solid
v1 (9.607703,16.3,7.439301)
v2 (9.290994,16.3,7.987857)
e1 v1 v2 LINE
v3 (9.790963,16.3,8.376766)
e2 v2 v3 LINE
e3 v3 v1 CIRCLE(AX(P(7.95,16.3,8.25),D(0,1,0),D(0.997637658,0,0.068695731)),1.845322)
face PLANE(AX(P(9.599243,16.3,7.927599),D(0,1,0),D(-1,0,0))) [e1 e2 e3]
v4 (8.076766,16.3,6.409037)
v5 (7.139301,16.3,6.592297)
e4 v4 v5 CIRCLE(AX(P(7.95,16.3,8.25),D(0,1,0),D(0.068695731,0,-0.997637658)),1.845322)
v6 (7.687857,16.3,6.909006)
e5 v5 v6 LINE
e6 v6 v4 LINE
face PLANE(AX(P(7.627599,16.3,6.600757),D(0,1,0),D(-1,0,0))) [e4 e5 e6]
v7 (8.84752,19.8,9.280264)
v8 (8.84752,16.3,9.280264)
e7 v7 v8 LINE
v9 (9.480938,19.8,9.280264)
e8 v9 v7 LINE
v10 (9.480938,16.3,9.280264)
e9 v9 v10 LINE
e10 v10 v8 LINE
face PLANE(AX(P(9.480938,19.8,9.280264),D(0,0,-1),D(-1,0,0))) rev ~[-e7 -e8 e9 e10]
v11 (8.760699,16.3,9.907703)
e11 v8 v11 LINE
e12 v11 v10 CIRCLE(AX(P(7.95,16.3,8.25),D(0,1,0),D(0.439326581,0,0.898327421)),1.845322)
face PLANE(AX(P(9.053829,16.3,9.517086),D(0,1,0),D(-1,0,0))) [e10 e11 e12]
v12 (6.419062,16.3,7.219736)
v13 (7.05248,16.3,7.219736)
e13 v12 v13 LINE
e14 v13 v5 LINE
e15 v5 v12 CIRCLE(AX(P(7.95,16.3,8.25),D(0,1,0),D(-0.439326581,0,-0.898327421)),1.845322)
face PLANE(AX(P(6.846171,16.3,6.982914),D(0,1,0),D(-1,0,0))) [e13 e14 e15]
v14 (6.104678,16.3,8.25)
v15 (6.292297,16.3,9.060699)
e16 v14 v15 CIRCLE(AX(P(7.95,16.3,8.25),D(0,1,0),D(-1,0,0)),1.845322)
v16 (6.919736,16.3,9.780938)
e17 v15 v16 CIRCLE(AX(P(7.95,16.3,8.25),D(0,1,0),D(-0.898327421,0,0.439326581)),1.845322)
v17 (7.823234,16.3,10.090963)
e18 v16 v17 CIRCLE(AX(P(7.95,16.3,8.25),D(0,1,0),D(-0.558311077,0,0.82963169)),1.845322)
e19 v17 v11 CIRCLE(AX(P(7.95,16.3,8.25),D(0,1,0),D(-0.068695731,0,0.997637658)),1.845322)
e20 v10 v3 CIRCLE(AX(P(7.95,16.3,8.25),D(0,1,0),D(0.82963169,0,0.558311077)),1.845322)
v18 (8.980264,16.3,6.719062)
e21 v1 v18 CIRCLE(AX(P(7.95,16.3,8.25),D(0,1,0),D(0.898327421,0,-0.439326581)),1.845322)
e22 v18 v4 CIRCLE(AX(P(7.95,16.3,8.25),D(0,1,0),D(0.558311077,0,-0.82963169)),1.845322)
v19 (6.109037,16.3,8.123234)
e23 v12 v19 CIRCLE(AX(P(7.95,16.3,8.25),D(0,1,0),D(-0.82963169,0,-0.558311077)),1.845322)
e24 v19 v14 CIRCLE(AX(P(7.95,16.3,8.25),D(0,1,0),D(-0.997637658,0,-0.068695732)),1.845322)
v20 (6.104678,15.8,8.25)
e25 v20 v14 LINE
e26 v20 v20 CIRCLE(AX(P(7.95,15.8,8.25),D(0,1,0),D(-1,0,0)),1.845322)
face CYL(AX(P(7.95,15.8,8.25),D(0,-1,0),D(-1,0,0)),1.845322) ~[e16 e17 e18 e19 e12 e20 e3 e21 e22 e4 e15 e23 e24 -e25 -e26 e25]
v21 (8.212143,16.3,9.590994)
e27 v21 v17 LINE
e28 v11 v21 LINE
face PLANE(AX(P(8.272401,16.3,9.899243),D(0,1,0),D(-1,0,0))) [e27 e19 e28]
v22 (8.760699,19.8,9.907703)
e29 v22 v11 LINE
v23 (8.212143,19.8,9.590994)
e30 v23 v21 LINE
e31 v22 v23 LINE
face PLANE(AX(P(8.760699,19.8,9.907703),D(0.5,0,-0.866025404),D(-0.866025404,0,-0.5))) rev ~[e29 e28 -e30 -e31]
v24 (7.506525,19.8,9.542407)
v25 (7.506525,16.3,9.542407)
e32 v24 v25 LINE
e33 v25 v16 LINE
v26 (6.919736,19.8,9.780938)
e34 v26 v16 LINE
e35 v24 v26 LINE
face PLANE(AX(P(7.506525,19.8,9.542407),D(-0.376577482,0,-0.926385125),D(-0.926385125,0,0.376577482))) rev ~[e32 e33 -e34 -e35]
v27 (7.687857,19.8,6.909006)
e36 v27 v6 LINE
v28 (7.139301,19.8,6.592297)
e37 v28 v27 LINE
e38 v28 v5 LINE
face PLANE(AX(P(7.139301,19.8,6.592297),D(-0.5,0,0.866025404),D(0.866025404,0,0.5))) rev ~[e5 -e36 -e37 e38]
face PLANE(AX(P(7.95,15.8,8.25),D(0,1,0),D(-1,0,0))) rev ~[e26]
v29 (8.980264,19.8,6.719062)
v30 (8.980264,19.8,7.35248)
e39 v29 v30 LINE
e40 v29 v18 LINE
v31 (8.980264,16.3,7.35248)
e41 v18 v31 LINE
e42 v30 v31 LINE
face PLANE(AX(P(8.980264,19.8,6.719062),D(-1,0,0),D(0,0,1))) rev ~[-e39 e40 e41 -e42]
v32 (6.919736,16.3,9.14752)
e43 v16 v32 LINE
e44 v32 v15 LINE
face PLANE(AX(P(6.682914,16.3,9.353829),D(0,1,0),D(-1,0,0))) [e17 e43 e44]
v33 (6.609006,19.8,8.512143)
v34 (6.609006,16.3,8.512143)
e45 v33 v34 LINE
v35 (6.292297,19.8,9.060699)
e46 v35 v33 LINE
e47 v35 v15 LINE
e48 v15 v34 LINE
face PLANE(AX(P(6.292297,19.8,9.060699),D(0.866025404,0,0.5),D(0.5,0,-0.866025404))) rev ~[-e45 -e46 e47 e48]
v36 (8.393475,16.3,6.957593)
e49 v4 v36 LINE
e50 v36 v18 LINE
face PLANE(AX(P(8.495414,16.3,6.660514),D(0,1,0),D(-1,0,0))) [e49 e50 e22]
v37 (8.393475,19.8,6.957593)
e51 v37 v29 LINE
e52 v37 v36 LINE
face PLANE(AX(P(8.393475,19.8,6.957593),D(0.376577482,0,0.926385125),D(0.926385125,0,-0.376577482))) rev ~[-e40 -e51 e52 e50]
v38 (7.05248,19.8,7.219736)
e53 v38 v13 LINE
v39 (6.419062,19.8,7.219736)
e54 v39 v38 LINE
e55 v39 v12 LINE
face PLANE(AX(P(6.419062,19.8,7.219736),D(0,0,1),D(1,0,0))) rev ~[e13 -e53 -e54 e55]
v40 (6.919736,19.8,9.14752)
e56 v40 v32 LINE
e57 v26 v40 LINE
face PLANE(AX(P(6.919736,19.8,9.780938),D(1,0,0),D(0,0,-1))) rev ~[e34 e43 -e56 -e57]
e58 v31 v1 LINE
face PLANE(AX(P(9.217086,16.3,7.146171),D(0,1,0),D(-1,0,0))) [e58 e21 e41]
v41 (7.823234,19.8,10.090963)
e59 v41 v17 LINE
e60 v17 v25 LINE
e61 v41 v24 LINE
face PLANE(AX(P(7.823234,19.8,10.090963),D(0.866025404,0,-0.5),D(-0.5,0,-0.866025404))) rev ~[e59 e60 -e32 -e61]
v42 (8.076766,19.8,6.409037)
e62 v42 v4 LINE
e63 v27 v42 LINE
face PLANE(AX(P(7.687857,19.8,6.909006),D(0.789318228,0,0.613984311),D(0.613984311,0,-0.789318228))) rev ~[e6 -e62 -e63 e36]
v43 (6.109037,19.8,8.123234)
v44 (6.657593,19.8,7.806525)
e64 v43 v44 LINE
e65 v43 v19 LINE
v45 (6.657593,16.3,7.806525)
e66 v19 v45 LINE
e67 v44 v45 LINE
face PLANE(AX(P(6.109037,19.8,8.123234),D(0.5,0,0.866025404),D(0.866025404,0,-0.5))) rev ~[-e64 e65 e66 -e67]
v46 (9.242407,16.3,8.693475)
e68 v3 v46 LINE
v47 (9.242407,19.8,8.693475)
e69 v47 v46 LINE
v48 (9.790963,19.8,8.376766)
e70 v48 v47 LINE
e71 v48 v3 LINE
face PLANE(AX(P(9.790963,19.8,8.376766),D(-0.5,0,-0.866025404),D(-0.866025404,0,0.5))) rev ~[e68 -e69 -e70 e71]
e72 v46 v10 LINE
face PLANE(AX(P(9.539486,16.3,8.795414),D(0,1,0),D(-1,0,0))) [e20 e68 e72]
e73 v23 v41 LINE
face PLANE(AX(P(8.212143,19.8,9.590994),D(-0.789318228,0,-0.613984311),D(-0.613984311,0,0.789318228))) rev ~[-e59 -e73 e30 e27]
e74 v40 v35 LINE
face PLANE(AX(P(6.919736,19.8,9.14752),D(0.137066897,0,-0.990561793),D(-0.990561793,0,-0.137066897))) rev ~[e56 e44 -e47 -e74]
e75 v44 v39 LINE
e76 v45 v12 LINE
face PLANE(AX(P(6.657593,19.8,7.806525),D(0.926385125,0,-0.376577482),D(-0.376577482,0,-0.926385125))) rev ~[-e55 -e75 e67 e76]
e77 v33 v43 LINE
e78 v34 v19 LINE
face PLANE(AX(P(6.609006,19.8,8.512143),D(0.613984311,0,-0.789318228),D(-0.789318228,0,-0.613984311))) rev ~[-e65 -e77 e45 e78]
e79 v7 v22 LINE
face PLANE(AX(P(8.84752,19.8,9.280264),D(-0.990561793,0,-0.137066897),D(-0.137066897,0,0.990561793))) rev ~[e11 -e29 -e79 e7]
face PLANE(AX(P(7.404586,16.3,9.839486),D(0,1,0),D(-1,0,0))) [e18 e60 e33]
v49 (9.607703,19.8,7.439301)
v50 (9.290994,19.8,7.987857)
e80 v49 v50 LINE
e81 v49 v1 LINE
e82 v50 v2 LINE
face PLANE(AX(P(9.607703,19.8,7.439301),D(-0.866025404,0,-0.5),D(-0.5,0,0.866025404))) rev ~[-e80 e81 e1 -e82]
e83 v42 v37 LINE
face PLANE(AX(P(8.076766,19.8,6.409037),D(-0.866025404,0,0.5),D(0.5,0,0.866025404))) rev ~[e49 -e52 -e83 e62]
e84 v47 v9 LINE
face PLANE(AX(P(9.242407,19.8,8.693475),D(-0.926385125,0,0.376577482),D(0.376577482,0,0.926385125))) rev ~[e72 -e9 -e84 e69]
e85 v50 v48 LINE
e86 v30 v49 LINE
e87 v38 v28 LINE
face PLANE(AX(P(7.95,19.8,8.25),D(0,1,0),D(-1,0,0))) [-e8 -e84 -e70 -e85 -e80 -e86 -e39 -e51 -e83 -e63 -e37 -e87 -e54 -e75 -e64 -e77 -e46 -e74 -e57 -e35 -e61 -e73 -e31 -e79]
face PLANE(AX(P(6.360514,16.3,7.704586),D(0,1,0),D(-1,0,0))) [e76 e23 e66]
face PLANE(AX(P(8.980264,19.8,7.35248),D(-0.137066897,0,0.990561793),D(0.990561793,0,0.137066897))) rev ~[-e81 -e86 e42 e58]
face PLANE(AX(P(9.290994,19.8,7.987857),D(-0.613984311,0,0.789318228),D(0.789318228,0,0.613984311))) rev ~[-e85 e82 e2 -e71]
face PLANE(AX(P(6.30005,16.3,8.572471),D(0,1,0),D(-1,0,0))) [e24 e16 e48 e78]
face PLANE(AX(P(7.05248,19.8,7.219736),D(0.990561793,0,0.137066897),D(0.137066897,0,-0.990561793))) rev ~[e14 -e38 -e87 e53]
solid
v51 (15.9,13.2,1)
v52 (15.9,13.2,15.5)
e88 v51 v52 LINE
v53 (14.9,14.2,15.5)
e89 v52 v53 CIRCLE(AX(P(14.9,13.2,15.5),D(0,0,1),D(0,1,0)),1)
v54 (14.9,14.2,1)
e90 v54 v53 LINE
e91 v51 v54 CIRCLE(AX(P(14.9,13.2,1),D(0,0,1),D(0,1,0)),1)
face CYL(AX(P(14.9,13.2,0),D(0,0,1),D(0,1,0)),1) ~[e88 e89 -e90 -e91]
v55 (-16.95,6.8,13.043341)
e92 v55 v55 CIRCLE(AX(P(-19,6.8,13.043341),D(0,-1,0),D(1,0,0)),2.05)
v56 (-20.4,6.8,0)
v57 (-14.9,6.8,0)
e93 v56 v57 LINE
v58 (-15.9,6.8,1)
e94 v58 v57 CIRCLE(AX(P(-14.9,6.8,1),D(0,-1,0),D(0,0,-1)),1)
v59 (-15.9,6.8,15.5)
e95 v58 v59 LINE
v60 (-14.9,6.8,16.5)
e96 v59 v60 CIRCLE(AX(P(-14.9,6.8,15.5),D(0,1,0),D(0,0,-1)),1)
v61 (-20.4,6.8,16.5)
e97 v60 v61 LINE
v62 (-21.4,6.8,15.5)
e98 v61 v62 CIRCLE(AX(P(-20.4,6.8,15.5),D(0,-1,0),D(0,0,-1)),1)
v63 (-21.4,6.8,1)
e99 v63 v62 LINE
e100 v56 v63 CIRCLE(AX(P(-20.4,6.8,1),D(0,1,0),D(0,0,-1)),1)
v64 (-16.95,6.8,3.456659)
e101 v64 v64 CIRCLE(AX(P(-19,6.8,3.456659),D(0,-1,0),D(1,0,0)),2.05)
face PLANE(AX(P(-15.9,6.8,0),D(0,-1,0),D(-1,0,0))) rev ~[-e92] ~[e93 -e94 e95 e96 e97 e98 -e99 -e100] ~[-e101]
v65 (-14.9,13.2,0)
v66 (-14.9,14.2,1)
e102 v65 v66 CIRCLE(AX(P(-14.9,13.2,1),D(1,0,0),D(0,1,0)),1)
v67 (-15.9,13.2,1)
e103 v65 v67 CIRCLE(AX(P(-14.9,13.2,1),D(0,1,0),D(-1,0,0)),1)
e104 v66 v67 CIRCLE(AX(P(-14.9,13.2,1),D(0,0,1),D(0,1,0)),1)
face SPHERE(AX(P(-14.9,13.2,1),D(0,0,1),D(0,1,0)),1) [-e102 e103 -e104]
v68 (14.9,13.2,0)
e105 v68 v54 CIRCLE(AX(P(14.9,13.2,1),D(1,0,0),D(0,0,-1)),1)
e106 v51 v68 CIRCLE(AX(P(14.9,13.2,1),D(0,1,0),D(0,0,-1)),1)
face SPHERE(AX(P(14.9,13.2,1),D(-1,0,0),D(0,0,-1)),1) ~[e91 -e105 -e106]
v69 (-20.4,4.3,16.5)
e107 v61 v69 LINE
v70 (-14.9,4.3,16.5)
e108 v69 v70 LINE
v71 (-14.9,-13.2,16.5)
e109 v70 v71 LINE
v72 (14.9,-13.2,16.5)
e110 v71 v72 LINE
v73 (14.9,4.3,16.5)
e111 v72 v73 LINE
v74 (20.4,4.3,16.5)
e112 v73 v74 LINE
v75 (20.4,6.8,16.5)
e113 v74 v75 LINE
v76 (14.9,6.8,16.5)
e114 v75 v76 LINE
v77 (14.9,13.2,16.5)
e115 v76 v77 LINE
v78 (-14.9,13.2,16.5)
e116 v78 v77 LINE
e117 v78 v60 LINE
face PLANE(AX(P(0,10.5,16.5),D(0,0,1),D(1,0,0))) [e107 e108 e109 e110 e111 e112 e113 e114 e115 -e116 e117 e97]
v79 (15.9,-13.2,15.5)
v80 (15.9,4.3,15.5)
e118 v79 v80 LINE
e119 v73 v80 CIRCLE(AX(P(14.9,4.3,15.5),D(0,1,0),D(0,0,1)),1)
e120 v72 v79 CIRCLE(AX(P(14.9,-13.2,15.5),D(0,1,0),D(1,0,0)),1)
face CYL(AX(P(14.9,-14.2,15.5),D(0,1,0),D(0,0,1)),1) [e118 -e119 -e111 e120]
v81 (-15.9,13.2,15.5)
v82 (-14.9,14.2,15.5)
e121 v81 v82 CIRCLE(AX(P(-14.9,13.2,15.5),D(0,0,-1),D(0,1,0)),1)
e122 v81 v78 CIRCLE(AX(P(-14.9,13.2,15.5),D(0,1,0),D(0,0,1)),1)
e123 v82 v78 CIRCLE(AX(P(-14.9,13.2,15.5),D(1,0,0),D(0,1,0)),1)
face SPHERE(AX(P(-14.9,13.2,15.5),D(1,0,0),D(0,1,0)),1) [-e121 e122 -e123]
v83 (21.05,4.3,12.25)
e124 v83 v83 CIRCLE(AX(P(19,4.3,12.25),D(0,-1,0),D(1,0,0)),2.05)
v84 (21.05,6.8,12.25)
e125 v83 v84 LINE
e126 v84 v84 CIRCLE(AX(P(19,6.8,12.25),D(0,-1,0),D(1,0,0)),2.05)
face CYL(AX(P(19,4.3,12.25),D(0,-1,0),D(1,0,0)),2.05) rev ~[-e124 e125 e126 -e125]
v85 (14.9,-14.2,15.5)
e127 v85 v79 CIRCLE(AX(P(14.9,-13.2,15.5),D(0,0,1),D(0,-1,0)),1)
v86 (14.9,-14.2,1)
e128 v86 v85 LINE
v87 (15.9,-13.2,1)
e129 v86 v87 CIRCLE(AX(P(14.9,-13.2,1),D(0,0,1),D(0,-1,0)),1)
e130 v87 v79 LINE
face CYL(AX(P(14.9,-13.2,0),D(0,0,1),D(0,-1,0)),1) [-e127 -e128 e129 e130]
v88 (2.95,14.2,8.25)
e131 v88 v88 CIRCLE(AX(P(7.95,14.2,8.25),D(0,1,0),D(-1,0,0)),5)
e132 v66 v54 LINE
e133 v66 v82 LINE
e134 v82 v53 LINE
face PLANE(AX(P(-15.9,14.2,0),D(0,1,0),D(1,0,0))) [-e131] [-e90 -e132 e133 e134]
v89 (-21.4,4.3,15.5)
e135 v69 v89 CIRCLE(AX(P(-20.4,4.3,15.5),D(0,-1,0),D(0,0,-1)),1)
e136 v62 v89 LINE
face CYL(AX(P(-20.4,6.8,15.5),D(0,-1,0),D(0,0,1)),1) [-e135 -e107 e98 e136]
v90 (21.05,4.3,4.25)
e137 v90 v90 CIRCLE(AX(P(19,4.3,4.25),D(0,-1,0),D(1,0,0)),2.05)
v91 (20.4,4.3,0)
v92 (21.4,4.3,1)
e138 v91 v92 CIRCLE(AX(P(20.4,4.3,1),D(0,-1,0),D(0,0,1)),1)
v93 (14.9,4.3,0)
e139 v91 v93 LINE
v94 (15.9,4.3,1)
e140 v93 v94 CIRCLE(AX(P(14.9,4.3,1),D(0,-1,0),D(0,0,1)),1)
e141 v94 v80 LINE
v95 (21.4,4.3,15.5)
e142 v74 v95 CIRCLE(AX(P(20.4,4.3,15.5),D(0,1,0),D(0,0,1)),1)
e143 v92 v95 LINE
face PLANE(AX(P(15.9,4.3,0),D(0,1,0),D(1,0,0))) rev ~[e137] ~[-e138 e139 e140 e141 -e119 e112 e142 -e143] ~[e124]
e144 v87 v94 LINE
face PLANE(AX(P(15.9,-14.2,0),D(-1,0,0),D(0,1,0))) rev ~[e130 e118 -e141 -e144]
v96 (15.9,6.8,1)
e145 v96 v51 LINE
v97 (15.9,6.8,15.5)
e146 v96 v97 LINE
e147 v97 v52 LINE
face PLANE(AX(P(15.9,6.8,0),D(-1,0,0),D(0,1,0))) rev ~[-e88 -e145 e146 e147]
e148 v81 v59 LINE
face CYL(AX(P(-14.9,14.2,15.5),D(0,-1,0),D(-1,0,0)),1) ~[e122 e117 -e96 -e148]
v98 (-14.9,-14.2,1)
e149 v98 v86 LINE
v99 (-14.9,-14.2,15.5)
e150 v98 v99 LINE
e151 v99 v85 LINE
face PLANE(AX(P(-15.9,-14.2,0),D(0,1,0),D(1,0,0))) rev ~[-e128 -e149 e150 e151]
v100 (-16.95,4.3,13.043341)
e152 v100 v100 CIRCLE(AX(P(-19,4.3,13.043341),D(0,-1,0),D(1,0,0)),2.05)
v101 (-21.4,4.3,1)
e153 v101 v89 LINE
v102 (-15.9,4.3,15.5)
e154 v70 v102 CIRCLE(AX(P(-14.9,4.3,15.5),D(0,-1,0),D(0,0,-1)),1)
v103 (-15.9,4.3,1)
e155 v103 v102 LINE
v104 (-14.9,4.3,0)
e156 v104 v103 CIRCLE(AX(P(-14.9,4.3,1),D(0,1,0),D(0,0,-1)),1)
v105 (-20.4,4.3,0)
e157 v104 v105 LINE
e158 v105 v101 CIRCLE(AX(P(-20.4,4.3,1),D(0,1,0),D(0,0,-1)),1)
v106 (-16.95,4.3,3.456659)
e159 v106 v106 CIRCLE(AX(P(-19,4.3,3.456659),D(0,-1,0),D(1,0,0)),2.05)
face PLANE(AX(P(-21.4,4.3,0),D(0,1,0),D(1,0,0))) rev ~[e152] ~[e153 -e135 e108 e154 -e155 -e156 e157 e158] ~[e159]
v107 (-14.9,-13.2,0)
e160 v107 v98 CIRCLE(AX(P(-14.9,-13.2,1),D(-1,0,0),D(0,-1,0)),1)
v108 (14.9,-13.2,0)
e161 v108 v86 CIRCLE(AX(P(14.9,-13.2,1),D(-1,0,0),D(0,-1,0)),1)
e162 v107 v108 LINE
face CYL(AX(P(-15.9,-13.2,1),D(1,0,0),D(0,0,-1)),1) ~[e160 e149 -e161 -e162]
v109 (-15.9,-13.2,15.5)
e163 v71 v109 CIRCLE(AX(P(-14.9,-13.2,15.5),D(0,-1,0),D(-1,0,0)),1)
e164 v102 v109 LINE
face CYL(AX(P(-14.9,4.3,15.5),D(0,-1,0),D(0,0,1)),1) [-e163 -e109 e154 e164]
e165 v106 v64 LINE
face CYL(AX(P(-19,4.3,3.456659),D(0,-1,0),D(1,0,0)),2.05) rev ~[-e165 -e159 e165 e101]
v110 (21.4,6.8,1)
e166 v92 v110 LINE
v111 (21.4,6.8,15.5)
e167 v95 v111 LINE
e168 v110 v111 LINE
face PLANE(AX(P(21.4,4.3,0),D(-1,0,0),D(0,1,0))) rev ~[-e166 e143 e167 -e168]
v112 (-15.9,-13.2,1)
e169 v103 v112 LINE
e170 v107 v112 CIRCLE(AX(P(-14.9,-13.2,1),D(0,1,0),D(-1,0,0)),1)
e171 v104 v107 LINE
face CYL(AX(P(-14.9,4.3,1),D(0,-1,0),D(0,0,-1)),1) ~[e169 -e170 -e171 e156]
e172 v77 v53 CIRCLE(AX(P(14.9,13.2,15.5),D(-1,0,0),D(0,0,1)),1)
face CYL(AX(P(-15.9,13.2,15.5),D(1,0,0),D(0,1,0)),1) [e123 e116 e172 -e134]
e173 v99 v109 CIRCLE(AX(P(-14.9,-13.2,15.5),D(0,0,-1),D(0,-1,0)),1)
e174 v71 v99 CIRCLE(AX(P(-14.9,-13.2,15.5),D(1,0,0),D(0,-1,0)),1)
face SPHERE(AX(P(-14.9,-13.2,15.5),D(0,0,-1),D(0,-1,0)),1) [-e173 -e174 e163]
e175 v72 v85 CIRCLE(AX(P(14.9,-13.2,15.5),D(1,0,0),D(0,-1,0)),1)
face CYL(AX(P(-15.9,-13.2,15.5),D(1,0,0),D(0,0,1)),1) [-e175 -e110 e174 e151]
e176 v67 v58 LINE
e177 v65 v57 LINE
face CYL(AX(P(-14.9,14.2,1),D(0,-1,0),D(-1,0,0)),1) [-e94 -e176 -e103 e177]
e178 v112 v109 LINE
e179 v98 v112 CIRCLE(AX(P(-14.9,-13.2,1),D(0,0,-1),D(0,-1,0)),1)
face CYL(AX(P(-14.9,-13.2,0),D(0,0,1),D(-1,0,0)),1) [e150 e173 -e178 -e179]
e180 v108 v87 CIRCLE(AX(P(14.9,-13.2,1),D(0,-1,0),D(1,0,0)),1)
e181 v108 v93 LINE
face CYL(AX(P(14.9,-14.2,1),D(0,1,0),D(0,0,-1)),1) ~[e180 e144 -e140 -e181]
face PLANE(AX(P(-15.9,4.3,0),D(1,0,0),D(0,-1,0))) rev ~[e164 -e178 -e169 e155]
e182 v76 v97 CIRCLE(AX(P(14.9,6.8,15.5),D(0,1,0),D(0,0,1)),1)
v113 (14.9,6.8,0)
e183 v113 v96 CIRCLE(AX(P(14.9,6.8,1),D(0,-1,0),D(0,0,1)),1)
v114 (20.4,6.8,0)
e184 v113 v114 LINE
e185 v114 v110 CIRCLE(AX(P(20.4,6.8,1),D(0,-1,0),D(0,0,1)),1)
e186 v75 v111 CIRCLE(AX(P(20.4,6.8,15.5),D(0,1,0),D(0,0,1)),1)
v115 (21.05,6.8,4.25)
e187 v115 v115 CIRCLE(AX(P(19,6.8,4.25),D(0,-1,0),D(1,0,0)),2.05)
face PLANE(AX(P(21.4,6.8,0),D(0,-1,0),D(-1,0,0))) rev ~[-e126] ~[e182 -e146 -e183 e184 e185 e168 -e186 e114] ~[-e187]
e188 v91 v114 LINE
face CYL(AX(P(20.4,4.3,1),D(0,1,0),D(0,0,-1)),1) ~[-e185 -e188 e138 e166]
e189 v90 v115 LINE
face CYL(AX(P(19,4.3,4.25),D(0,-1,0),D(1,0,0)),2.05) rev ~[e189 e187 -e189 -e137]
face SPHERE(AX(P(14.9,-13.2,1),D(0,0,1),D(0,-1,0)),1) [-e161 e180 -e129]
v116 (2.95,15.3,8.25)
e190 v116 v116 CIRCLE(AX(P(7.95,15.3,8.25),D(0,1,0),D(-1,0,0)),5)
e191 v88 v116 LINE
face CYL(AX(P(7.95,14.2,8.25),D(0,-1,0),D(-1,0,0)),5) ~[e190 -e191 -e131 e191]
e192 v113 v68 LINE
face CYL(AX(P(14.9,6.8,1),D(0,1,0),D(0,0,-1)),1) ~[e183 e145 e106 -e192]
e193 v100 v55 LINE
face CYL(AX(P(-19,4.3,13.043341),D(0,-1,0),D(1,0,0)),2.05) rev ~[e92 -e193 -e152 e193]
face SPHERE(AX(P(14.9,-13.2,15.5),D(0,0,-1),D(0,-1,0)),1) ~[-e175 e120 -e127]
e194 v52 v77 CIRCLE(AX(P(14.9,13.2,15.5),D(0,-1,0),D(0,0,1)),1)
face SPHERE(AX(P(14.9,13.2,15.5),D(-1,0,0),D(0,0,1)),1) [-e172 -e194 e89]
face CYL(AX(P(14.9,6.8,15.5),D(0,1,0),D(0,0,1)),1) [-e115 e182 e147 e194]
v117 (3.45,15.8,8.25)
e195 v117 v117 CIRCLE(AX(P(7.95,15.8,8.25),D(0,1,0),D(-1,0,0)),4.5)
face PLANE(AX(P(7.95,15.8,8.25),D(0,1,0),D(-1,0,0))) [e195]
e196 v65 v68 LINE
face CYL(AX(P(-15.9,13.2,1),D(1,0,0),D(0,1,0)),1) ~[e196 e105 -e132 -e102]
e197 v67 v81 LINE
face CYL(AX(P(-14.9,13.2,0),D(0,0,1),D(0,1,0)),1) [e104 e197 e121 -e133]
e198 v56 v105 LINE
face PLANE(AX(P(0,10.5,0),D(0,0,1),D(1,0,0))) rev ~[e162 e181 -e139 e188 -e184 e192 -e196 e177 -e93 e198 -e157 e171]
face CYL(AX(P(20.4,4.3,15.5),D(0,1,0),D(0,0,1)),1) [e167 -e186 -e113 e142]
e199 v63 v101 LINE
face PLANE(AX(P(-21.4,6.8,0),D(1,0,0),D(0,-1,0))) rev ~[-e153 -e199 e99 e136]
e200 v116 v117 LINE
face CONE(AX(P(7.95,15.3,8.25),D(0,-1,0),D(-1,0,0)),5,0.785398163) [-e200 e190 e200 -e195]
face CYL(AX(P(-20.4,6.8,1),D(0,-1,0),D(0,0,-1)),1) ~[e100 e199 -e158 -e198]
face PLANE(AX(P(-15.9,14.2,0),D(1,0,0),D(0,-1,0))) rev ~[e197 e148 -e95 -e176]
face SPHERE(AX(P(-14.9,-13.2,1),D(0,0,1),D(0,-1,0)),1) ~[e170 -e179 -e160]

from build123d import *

# Parameters (mm, degrees)
F0_W      = 31.8
F0_H      = 7.4
F0_H_2    = 2.5
F0_H_3    = 18.5
F1_DEPTH  = 16.5
F4_R      = 2.05
F5_DEPTH  = 9.901
F6_R      = 5
F6_R_2    = 1.8453220601
F7_DEPTH  = 1.6
F8_SIZE   = 0.5
F9_R      = 1.8453220601
F10_DEPTH = 4
F12_DEPTH = 3.5
F13_R     = 1


# Not quite as in the source:
# - a feature names something its author has since deleted; it is built from what else it names


with BuildPart() as f1:
    # F0 (on Top) → F1 (new body)
    with BuildSketch(Plane.XY):
        with Locations((0, 10.5)):
            Rectangle(F0_W, F0_H)
        with Locations((0, 5.55)):
            Rectangle(F0_W, F0_H_2)
        with Locations((0, -4.95)):
            Rectangle(F0_W, F0_H_3)
        Polygon((-15.9, 4.3), (-15.9, 6.8), (-19, 6.8), (-21.4, 6.8), (-21.4, 4.3), (-19, 4.3), align=None)
        Polygon((19, 6.8), (15.9, 6.8), (15.9, 4.3), (19, 4.3), (21.4, 4.3), (21.4, 6.8), align=None)
    extrude(amount=F1_DEPTH)

    # F4 (on offset) → F5 (cut, through all)
    with BuildSketch(Plane.XZ.offset(-4.3)):
        with Locations((-19, 13.0433406178)):
            Circle(F4_R)
        with Locations((-19, 3.4566593822)):
            Circle(F4_R)
        with Locations((19, 12.25)):
            Circle(F4_R)
        with Locations((19, 4.25)):
            Circle(F4_R)
    extrude(amount=-F5_DEPTH, mode=Mode.SUBTRACT)

    # F6 (on face) → F7 (join)
    with BuildSketch(Plane(origin=(0, 14.2, 0), x_dir=(-1, 0, 0), z_dir=(0, 1, 0))):
        with Locations((-7.95, 8.25)):
            Circle(F6_R)
        with Locations((-7.95, 8.25)):
            Circle(F6_R_2, mode=Mode.SUBTRACT)
        with Locations((-7.95, 8.25)):
            Circle(F6_R_2)
    extrude(amount=F7_DEPTH)

    # F8
    f8_edges = [f1.edges().sort_by_distance(p)[0] for p in [
        (12.95, 15.8, 8.25),
    ]]
    chamfer(f8_edges, length=F8_SIZE)

    # F13
    f13_edges = [f1.edges().sort_by_distance(p)[0] for p in [
        (-15.9, -14.2, 8.25),
        (15.9, -14.2, 8.25),
        (0, -14.2, 0),
        (0, -14.2, 16.5),
        (0, 14.2, 16.5),
        (15.9, -4.95, 16.5),
        (15.9, -4.95, 0),
        (-15.9, -4.95, 0),
        (-15.9, -4.95, 16.5),
        (-15.9, 14.2, 8.25),
        (0, 14.2, 0),
        (15.9, 10.5, 0),
        (15.9, 10.5, 16.5),
        (21.4, 5.55, 16.5),
        (21.4, 5.55, 0),
        (-21.4, 5.55, 0),
        (-21.4, 5.55, 16.5),
        (-15.9, 10.5, 16.5),
        (-15.9, 10.5, 0),
        (15.9, 14.2, 8.25),
    ]]
    fillet(f13_edges, radius=F13_R)


with BuildPart() as f10:
    # F9 (on face) → F10 (new body)
    with BuildSketch(Plane(origin=(0, 15.8, 0), x_dir=(-1, 0, 0), z_dir=(0, 1, 0))):
        with Locations((-7.95, 8.25)):
            Circle(F9_R)
    extrude(amount=F10_DEPTH)

    # F11 (on face) → F12 (cut)
    with BuildSketch(Plane(origin=(0, 19.8, 0), x_dir=(-1, 0, 0), z_dir=(0, 1, 0))):
        with BuildLine():
            Line((-9.4809376593, 9.2802637472), (-8.8475196691, 9.2802637472))
            Line((-8.8475196691, 9.2802637472), (-8.760699031, 9.9077034073))
            ThreePointArc((-8.760699031, 9.9077034073), (-9.1621203443, 9.6413941844), (-9.4809376593, 9.2802637472))
        make_face()
        with BuildLine():
            Line((-9.7909627781, 8.376765748), (-9.2424067074, 8.6934747431))
            Line((-9.2424067074, 8.6934747431), (-9.4809376593, 9.2802637472))
            ThreePointArc((-9.4809376593, 9.2802637472), (-9.6954241028, 8.8489225382), (-9.7909627781, 8.376765748))
        make_face()
        with BuildLine():
            Line((-9.6077034073, 7.439300969), (-9.2909944122, 7.9878570397))
            Line((-9.2909944122, 7.9878570397), (-9.7909627781, 8.376765748))
            ThreePointArc((-9.7909627781, 8.376765748), (-9.7610428825, 7.8959700816), (-9.6077034073, 7.439300969))
        make_face()
        with BuildLine():
            Line((-8.9802637472, 6.7190623407), (-8.9802637472, 7.3524803309))
            Line((-8.9802637472, 7.3524803309), (-9.6077034073, 7.439300969))
            ThreePointArc((-9.6077034073, 7.439300969), (-9.3413941844, 7.0378796557), (-8.9802637472, 6.7190623407))
        make_face()
        with BuildLine():
            Line((-8.076765748, 6.4090372219), (-8.3934747431, 6.9575932926))
            Line((-8.3934747431, 6.9575932926), (-8.9802637472, 6.7190623407))
            ThreePointArc((-8.9802637472, 6.7190623407), (-8.5489225382, 6.5045758972), (-8.076765748, 6.4090372219))
        make_face()
        with BuildLine():
            Line((-7.139300969, 6.5922965927), (-7.6878570397, 6.9090055878))
            Line((-7.6878570397, 6.9090055878), (-8.076765748, 6.4090372219))
            ThreePointArc((-8.076765748, 6.4090372219), (-7.5959700816, 6.4389571175), (-7.139300969, 6.5922965927))
        make_face()
        with BuildLine():
            Line((-6.4190623407, 7.2197362528), (-7.0524803309, 7.2197362528))
            Line((-7.0524803309, 7.2197362528), (-7.139300969, 6.5922965927))
            ThreePointArc((-7.139300969, 6.5922965927), (-6.7378796557, 6.8586058156), (-6.4190623407, 7.2197362528))
        make_face()
        with BuildLine():
            Line((-6.1090372219, 8.123234252), (-6.6575932926, 7.8065252569))
            Line((-6.6575932926, 7.8065252569), (-6.4190623407, 7.2197362528))
            ThreePointArc((-6.4190623407, 7.2197362528), (-6.2045758972, 7.6510774618), (-6.1090372219, 8.123234252))
        make_face()
        with BuildLine():
            Line((-6.2922965927, 9.060699031), (-6.6090055878, 8.5121429603))
            Line((-6.6090055878, 8.5121429603), (-6.1090372219, 8.123234252))
            ThreePointArc((-6.1090372219, 8.123234252), (-6.1057680824, 8.1865796598), (-6.1046779399, 8.25))
            ThreePointArc((-6.1046779399, 8.25), (-6.1521943693, 8.6660629994), (-6.2922965927, 9.060699031))
        make_face()
        with BuildLine():
            Line((-6.9197362528, 9.7809376593), (-6.9197362528, 9.1475196691))
            Line((-6.9197362528, 9.1475196691), (-6.2922965927, 9.060699031))
            ThreePointArc((-6.2922965927, 9.060699031), (-6.5586058156, 9.4621203443), (-6.9197362528, 9.7809376593))
        make_face()
        with BuildLine():
            Line((-7.823234252, 10.0909627781), (-7.5065252569, 9.5424067074))
            Line((-7.5065252569, 9.5424067074), (-6.9197362528, 9.7809376593))
            ThreePointArc((-6.9197362528, 9.7809376593), (-7.3510774618, 9.9954241028), (-7.823234252, 10.0909627781))
        make_face()
        with BuildLine():
            Line((-8.760699031, 9.9077034073), (-8.2121429603, 9.5909944122))
            Line((-8.2121429603, 9.5909944122), (-7.823234252, 10.0909627781))
            ThreePointArc((-7.823234252, 10.0909627781), (-8.3040299184, 10.0610428825), (-8.760699031, 9.9077034073))
        make_face()
    extrude(amount=-F12_DEPTH, mode=Mode.SUBTRACT)


solid = Compound([f1.part, f10.part])
